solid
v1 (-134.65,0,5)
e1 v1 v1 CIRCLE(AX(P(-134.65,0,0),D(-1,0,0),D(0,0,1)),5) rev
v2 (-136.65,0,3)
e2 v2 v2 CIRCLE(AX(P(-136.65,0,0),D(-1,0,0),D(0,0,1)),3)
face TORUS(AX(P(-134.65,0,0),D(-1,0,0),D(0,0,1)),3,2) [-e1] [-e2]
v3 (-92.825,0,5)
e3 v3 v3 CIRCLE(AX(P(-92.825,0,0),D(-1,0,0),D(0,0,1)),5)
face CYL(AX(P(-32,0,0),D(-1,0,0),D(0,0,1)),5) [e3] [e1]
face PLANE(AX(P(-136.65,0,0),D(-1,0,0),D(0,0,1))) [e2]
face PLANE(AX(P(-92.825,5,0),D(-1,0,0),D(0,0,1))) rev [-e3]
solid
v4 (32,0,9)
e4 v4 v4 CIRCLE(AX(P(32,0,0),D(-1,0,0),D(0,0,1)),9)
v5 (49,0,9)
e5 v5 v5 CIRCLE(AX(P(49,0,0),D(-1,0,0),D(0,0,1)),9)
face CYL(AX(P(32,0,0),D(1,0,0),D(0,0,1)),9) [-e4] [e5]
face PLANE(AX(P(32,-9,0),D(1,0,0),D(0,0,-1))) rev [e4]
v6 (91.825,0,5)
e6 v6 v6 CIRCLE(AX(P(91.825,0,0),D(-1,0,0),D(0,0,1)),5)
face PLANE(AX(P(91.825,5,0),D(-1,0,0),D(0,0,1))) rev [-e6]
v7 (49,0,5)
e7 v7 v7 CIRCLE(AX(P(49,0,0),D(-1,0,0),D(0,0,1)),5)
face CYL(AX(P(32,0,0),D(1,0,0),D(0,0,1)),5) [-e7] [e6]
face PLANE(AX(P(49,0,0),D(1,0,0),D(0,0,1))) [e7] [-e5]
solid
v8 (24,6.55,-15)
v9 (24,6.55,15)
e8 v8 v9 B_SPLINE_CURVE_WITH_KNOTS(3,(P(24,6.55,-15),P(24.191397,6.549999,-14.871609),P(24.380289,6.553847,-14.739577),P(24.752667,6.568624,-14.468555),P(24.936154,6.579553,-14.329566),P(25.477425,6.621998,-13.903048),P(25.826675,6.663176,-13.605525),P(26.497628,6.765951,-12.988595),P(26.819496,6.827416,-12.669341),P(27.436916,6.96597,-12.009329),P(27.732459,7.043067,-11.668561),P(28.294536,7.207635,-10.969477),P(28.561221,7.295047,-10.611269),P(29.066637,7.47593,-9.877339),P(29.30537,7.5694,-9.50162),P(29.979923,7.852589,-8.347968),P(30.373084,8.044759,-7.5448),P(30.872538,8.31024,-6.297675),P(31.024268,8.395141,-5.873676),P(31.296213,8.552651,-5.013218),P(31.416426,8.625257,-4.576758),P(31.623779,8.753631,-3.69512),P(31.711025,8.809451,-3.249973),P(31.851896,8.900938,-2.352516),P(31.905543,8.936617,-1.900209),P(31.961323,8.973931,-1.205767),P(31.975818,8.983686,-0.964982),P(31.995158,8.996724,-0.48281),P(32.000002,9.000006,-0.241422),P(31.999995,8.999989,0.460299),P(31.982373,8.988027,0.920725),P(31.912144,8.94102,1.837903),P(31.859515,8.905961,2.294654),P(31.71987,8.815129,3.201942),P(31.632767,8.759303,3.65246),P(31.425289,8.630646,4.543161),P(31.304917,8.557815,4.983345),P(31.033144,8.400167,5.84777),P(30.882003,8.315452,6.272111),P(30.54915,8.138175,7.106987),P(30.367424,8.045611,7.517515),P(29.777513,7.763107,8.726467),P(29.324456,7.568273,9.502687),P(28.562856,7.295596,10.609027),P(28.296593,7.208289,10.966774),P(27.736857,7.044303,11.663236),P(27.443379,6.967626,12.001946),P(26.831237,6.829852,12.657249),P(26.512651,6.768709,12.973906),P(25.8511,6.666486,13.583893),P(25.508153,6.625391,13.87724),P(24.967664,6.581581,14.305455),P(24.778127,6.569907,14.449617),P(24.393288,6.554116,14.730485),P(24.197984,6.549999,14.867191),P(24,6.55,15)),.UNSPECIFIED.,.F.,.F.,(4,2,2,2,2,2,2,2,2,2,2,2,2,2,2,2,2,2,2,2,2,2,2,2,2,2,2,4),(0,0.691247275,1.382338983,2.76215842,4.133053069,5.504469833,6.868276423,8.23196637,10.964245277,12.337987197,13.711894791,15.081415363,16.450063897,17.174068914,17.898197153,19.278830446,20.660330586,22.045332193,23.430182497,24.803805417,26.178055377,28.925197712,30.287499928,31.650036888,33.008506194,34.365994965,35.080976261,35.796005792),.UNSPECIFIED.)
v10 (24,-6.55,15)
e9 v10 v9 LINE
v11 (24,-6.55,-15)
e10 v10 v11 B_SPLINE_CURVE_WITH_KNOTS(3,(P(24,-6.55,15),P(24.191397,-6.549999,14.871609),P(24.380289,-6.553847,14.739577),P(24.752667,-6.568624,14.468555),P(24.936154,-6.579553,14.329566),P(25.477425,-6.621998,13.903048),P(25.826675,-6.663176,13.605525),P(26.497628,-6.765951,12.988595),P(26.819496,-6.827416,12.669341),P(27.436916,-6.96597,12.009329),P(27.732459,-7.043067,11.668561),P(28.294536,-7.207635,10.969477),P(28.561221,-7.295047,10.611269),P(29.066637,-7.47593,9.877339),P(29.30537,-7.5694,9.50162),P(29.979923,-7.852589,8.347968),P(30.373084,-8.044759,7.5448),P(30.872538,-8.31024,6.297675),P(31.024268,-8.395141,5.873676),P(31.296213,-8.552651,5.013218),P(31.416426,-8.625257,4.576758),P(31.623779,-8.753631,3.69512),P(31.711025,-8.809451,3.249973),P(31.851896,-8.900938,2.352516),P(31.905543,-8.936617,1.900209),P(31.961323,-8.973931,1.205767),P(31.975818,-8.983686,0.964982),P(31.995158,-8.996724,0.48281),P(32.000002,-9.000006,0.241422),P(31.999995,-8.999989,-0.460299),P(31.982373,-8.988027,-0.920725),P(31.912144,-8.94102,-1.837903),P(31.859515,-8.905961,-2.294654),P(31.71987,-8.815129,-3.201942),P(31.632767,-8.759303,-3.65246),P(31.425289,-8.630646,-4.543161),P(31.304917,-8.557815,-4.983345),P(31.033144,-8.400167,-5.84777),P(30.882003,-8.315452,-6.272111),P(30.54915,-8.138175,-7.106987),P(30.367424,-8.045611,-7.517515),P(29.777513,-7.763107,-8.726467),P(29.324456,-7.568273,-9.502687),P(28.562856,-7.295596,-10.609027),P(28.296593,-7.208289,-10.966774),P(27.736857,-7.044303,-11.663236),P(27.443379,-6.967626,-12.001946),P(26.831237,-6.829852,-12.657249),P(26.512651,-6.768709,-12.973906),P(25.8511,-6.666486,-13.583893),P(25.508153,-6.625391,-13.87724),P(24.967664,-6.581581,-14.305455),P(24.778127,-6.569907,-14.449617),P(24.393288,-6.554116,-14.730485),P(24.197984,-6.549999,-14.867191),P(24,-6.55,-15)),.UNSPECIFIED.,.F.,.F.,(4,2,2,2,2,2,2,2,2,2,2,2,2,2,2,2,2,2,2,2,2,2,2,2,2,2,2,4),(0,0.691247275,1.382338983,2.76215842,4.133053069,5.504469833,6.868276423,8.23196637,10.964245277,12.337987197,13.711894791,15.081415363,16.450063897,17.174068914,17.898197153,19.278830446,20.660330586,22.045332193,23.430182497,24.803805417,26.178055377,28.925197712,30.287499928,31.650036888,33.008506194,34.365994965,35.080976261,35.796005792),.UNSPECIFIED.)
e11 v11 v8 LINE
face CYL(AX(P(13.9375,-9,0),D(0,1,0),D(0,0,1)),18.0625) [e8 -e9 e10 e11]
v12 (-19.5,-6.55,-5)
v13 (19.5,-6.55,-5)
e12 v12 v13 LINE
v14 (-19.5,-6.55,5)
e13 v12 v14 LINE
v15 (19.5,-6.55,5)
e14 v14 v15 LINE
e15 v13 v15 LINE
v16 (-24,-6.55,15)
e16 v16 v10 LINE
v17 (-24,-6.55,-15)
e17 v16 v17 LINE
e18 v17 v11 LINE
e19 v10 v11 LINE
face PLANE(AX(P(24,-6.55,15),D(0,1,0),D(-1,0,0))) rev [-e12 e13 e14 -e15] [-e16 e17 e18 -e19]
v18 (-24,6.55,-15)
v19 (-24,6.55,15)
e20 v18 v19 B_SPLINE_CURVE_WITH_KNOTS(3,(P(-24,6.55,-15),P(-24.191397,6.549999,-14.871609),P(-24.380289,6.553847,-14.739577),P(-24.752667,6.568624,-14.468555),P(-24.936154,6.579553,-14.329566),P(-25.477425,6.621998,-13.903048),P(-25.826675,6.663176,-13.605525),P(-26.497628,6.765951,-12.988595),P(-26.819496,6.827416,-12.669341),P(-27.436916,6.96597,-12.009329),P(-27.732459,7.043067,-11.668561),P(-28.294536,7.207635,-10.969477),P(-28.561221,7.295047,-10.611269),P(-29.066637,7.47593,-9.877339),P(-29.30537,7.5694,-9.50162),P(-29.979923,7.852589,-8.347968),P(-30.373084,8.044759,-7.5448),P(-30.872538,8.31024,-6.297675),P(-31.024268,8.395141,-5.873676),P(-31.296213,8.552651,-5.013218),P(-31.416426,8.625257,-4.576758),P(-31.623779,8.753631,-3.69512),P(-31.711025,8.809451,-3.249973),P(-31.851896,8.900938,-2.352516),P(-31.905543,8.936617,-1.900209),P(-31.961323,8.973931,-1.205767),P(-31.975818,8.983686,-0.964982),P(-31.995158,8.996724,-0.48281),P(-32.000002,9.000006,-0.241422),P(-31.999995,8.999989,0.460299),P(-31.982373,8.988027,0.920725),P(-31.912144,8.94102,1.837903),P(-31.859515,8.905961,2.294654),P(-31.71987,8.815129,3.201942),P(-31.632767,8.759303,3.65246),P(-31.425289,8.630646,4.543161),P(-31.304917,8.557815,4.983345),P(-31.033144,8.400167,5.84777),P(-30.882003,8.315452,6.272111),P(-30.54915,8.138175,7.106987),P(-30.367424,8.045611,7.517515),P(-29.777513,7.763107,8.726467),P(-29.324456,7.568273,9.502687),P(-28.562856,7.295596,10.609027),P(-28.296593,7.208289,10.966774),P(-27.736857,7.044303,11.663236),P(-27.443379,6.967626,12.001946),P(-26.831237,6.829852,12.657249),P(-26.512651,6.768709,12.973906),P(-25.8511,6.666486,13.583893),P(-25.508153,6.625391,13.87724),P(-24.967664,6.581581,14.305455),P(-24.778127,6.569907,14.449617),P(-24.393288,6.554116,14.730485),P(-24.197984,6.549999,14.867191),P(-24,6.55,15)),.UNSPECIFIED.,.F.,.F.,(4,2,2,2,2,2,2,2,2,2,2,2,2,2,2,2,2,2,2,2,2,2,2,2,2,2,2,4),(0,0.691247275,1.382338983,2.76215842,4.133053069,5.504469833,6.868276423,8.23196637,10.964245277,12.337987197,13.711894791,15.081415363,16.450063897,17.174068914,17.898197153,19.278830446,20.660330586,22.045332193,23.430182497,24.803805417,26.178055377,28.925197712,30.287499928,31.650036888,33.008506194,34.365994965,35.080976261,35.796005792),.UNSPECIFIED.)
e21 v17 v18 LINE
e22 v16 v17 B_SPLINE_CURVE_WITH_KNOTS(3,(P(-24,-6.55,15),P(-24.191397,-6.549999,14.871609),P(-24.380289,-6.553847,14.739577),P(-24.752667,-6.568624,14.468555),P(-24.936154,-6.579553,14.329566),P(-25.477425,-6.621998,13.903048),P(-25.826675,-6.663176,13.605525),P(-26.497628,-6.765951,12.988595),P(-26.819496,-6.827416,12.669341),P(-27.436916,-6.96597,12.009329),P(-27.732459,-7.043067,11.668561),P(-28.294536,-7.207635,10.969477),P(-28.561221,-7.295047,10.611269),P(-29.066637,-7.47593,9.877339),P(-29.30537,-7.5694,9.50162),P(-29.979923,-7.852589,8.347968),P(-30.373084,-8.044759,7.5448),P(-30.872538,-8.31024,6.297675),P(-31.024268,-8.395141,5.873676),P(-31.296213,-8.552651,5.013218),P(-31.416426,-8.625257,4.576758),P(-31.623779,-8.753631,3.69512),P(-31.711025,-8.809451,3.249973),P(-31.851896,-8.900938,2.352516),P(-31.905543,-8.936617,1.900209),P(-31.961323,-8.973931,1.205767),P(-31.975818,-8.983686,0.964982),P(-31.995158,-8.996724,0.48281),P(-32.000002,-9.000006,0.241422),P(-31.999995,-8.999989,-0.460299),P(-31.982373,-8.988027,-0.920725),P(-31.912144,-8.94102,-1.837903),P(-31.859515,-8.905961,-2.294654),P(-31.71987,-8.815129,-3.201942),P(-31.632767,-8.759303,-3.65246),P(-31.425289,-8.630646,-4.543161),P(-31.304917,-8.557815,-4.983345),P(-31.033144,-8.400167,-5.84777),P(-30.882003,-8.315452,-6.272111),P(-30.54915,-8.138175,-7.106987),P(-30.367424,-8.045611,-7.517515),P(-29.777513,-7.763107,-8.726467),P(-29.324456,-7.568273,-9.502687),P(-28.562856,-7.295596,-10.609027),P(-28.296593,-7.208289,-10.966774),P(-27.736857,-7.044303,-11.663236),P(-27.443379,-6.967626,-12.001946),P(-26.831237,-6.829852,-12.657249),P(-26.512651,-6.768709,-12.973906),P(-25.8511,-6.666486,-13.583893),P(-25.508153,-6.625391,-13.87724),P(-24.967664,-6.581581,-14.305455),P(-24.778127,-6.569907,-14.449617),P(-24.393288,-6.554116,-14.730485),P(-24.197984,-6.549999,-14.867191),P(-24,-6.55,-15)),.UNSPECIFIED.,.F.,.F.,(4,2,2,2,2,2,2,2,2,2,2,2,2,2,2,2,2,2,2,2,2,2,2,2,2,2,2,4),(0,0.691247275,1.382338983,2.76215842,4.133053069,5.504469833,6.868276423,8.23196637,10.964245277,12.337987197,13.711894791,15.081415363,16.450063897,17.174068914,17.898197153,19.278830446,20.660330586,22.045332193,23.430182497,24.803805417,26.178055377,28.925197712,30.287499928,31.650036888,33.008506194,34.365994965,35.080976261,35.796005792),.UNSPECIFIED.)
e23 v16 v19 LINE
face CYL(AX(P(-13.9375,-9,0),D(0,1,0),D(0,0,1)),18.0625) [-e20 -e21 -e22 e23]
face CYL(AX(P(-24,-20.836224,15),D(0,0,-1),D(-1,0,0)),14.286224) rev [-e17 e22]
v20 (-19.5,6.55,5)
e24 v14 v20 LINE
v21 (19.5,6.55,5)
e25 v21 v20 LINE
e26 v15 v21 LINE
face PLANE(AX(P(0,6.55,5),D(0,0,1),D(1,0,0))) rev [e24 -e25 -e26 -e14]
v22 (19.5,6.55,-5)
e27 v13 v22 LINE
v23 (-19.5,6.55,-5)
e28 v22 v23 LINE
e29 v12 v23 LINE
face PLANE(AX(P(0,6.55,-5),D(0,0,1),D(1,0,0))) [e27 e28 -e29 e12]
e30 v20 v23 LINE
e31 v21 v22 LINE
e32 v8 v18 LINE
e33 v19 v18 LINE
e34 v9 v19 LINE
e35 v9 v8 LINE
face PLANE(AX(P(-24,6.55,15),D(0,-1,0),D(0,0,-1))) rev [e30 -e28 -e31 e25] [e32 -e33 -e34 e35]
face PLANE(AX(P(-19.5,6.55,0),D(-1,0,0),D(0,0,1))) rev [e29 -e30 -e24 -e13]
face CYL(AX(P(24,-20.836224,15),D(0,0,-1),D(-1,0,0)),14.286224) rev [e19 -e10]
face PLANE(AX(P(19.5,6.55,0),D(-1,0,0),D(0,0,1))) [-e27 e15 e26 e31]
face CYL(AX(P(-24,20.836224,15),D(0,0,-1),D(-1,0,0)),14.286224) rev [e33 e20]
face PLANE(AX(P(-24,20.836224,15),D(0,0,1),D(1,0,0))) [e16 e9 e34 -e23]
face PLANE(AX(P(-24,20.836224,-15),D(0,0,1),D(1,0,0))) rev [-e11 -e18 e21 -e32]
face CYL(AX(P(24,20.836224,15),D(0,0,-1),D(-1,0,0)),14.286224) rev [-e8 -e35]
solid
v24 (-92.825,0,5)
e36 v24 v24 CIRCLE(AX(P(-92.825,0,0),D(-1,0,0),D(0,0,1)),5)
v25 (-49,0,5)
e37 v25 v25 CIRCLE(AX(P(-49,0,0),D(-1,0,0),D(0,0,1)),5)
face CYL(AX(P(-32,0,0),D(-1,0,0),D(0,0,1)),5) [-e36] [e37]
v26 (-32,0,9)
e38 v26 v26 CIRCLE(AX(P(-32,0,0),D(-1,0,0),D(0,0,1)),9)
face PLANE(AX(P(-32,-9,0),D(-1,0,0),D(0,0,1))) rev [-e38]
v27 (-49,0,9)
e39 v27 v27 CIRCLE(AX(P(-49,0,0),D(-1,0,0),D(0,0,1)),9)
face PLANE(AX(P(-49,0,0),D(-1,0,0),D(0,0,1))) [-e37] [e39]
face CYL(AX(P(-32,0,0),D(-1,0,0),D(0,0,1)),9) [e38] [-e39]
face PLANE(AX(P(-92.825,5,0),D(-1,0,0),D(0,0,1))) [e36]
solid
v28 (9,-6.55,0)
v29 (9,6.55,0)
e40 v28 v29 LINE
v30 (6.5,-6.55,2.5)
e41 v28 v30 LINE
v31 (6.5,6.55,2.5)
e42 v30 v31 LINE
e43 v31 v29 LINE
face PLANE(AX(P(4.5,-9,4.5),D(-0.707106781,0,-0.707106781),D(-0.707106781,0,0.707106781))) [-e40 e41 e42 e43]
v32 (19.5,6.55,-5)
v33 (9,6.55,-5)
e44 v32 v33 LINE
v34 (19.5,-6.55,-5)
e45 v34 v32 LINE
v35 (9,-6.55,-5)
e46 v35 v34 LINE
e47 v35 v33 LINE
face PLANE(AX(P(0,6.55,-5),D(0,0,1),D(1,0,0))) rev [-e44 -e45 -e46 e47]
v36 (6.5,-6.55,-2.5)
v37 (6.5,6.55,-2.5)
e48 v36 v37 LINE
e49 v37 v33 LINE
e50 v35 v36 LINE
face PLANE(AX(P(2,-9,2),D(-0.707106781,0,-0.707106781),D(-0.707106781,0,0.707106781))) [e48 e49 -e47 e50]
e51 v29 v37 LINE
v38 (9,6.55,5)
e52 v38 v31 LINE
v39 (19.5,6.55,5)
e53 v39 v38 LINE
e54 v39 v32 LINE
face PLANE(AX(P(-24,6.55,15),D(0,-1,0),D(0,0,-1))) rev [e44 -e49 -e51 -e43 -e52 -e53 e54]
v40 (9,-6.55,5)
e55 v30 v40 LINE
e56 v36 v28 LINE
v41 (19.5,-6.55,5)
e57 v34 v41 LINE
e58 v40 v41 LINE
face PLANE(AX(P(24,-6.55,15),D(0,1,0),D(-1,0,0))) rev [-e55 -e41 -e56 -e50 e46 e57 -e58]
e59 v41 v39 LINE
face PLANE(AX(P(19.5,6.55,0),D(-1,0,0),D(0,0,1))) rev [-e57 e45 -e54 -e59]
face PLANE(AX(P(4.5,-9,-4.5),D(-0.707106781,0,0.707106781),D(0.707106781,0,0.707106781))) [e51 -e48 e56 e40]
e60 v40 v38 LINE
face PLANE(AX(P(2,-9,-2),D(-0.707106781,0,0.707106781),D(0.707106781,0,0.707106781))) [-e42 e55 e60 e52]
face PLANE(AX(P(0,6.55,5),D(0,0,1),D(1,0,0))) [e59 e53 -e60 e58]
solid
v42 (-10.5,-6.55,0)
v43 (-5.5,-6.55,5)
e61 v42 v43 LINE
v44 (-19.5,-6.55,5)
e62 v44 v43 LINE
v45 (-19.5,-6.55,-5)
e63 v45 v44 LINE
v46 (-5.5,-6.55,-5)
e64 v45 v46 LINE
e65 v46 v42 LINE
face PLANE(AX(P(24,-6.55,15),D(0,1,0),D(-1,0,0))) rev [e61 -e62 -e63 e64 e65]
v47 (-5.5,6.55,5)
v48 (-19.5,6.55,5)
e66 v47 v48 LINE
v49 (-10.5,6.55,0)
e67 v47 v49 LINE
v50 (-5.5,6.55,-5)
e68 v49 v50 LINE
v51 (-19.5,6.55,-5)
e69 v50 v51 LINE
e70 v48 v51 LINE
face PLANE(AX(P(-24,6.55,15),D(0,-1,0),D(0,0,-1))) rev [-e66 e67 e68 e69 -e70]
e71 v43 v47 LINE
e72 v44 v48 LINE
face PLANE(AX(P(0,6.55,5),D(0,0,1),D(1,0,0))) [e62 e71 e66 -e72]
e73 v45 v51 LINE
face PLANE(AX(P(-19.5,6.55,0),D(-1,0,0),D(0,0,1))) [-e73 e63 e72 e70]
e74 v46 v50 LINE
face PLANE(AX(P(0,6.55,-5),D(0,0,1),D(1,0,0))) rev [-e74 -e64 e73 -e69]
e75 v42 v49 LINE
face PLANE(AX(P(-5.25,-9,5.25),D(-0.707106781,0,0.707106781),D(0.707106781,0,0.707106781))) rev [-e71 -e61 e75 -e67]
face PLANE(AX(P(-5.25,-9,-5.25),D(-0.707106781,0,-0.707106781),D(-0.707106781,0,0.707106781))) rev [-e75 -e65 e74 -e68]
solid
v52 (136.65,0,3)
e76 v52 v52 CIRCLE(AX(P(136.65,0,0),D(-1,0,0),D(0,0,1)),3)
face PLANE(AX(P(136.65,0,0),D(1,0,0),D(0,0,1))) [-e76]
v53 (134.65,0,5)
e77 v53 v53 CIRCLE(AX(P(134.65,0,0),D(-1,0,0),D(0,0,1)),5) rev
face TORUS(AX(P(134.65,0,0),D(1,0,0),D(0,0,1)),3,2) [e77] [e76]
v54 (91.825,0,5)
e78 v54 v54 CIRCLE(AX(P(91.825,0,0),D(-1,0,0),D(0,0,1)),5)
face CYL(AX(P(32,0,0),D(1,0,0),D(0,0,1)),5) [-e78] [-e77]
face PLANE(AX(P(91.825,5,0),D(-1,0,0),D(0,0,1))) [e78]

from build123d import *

# Parameters (mm, degrees)
FILLET1_R               = 2
BOSS_EXTRUDE1_DEPTH     = 15
CUT_EXTRUDE2_DEPTH      = 139.347479196
CUT_EXTRUDE2_DEPTH_BACK = 139.347479196
SPLIT1_START            = -6.55
SPLIT1_DEPTH            = 13.1
SPLIT1_START_2          = -19.5
SPLIT1_2_OUTLINE_W      = 13.1
SPLIT1_2_OUTLINE_H      = 10
SPLIT1_2_DEPTH          = 39
SPLIT1_3_DEPTH          = 13.1
SPLIT2_START            = -136.65
SPLIT2_2_OUTLINE_R      = 5
SPLIT2_2_DEPTH          = 43.825
SPLIT2_START_2          = 91.825
SPLIT2_3_OUTLINE_R      = 5
SPLIT2_3_DEPTH          = 44.825


# Read off the part's stored shape, not the designer's step: Revolve9, Split1, Split2
with BuildPart() as part:
    # Revolve9 outline → Revolve9 (revolve)
    with BuildSketch(Plane.YX):
        with BuildLine():
            Line((9, -49), (9, -32))
            ThreePointArc((9, -32), (7.176225033, -28.183374834), (6.55, -24))
            Line((6.55, -24), (6.55, 0))
            Line((6.55, 0), (0, 0))
            Line((0, 0), (0, -136.65))
            Line((0, -136.65), (5, -136.65))
            Line((5, -136.65), (5, -49))
            Line((5, -49), (9, -49))
        make_face()
    revolve(axis=Axis((0, 0, 0), (1, 0, 0)))

    # Fillet1
    fillet1_edges = [part.edges().sort_by_distance(p)[0] for p in [
        (-136.65, -5, 0),
    ]]
    fillet(fillet1_edges, radius=FILLET1_R)

    # Mirror1: part across plane


with BuildPart() as part_1:
    add(part.part)
    add(part.part.mirror(Plane(origin=(0, 0, 0), x_dir=(0, 0, 1), z_dir=(1, 0, 0))))

    # Sketch5 → Boss-Extrude1 (add, symmetric)
    with BuildSketch(Plane.XY):
        with BuildLine():
            Line((-24, 6.55), (24, 6.55))
            ThreePointArc((24, 6.55), (28.183374834, 7.176225033), (32, 9))
            Line((32, 9), (32, -9))
            ThreePointArc((32, -9), (28.183374834, -7.176225033), (24, -6.55))
            Line((24, -6.55), (-24, -6.55))
            ThreePointArc((-24, -6.55), (-28.183374834, -7.176225033), (-32, -9))
            Line((-32, -9), (-32, 9))
            ThreePointArc((-32, 9), (-28.183374834, 7.176225033), (-24, 6.55))
        make_face()
    extrude(amount=BOSS_EXTRUDE1_DEPTH, both=True)

    # Sketch6 → Cut-Extrude2 (cut, two sides: drawn at the far end of the back side and taken through both)
    with BuildSketch(Plane(origin=(0, 6.55, 0), x_dir=(1, 0, 0), z_dir=(0, 1, 0)).offset(-CUT_EXTRUDE2_DEPTH_BACK)):
        with BuildLine():
            Line((-32, 15), (-32, 0))
            ThreePointArc((-32, 0), (-29.875, 8.5), (-24, 15))
            Line((-24, 15), (-32, 15))
        make_face()
        with BuildLine():
            ThreePointArc((-32, 0), (-29.875, -8.5), (-24, -15))
            Line((-24, -15), (-32, -15))
            Line((-32, -15), (-32, 0))
        make_face()
        with BuildLine():
            ThreePointArc((24, -15), (29.875, -8.5), (32, 0))
            Line((32, 0), (32, -15))
            Line((32, -15), (24, -15))
        make_face()
        with BuildLine():
            ThreePointArc((32, 0), (29.875, 8.5), (24, 15))
            Line((24, 15), (32, 15))
            Line((32, 15), (32, 0))
        make_face()
        Polygon((9, 5), (-5.5, 5), (-10.5, 0), (-5.5, -5), (9, -5), (6.5, -2.5), (9, 0), (6.5, 2.5), align=None)
    extrude(amount=CUT_EXTRUDE2_DEPTH + CUT_EXTRUDE2_DEPTH_BACK, mode=Mode.SUBTRACT)


with BuildPart() as cut_extrude2_piece_1:
    # of the separate pieces the step leaves, piece 1, a body of its own (cut_extrude2_pieces)
    add(part_1.part.solids().sort_by_distance((-24, -6.55, -15))[0])

    # Split1 2 outline → Split1 2 (cut)
    with BuildSketch(Plane.YZ.offset(SPLIT1_START_2)):
        Rectangle(SPLIT1_2_OUTLINE_W, SPLIT1_2_OUTLINE_H)
    extrude(amount=SPLIT1_2_DEPTH, mode=Mode.SUBTRACT)


with BuildPart() as cut_extrude2_piece_2:
    # of the separate pieces the step leaves, piece 2, a body of its own (cut_extrude2_pieces)
    add(part_1.part.solids().sort_by_distance((-136.65, 3, 0))[0])

    # Split2 2 outline → Split2 2 (cut)
    with BuildSketch(Plane.YZ.offset(SPLIT2_START)):
        Circle(SPLIT2_2_OUTLINE_R)
    extrude(amount=SPLIT2_2_DEPTH, mode=Mode.SUBTRACT)


with BuildPart() as cut_extrude2_piece_3:
    # of the separate pieces the step leaves, piece 3, a body of its own (cut_extrude2_pieces)
    add(part_1.part.solids().sort_by_distance((49, 9, 0))[0])

    # Split2 3 outline → Split2 3 (cut)
    with BuildSketch(Plane.YZ.offset(SPLIT2_START_2)):
        Circle(SPLIT2_3_OUTLINE_R)
    extrude(amount=SPLIT2_3_DEPTH, mode=Mode.SUBTRACT)


with BuildPart() as body_4:
    # Split1 outline → Split1 (new body)
    with BuildSketch(Plane(origin=(0, 0, 0), x_dir=(1, 0, 0), z_dir=(0, 1, 0)).offset(SPLIT1_START)):
        Polygon((19.5, 5), (9, 5), (6.5, 2.5), (9, 0), (6.5, -2.5), (9, -5), (19.5, -5), align=None)
    extrude(amount=SPLIT1_DEPTH)


with BuildPart() as body_5:
    # Split1 3 outline → Split1 3 (new body)
    with BuildSketch(Plane(origin=(0, 0, 0), x_dir=(1, 0, 0), z_dir=(0, 1, 0)).offset(SPLIT1_START)):
        Polygon((-19.5, 5), (-19.5, -5), (-5.5, -5), (-10.5, 0), (-5.5, 5), align=None)
    extrude(amount=SPLIT1_3_DEPTH)


with BuildPart() as body_6:
    # Split2 outline → Split2 (revolve)
    with BuildSketch(Plane.YX):
        with BuildLine():
            Line((0, 136.65), (0, 91.825))
            Line((0, 91.825), (5, 91.825))
            Line((5, 91.825), (5, 134.65))
            ThreePointArc((5, 134.65), (4.414213562, 136.064213562), (3, 136.65))
            Line((3, 136.65), (0, 136.65))
        make_face()
    revolve(axis=Axis((0, 0, 0), (1, 0, 0)))


with BuildPart() as body_7:
    # Split2 4 outline → Split2 4 (revolve)
    with BuildSketch(Plane.YX):
        with BuildLine():
            Line((5, -92.825), (0, -92.825))
            Line((0, -92.825), (0, -136.65))
            Line((0, -136.65), (3, -136.65))
            ThreePointArc((3, -136.65), (4.414213562, -136.064213562), (5, -134.65))
            Line((5, -134.65), (5, -92.825))
        make_face()
    revolve(axis=Axis((0, 0, 0), (1, 0, 0)))


solid = Compound([cut_extrude2_piece_1.part, cut_extrude2_piece_2.part, cut_extrude2_piece_3.part, body_4.part, body_5.part, body_6.part, body_7.part])
